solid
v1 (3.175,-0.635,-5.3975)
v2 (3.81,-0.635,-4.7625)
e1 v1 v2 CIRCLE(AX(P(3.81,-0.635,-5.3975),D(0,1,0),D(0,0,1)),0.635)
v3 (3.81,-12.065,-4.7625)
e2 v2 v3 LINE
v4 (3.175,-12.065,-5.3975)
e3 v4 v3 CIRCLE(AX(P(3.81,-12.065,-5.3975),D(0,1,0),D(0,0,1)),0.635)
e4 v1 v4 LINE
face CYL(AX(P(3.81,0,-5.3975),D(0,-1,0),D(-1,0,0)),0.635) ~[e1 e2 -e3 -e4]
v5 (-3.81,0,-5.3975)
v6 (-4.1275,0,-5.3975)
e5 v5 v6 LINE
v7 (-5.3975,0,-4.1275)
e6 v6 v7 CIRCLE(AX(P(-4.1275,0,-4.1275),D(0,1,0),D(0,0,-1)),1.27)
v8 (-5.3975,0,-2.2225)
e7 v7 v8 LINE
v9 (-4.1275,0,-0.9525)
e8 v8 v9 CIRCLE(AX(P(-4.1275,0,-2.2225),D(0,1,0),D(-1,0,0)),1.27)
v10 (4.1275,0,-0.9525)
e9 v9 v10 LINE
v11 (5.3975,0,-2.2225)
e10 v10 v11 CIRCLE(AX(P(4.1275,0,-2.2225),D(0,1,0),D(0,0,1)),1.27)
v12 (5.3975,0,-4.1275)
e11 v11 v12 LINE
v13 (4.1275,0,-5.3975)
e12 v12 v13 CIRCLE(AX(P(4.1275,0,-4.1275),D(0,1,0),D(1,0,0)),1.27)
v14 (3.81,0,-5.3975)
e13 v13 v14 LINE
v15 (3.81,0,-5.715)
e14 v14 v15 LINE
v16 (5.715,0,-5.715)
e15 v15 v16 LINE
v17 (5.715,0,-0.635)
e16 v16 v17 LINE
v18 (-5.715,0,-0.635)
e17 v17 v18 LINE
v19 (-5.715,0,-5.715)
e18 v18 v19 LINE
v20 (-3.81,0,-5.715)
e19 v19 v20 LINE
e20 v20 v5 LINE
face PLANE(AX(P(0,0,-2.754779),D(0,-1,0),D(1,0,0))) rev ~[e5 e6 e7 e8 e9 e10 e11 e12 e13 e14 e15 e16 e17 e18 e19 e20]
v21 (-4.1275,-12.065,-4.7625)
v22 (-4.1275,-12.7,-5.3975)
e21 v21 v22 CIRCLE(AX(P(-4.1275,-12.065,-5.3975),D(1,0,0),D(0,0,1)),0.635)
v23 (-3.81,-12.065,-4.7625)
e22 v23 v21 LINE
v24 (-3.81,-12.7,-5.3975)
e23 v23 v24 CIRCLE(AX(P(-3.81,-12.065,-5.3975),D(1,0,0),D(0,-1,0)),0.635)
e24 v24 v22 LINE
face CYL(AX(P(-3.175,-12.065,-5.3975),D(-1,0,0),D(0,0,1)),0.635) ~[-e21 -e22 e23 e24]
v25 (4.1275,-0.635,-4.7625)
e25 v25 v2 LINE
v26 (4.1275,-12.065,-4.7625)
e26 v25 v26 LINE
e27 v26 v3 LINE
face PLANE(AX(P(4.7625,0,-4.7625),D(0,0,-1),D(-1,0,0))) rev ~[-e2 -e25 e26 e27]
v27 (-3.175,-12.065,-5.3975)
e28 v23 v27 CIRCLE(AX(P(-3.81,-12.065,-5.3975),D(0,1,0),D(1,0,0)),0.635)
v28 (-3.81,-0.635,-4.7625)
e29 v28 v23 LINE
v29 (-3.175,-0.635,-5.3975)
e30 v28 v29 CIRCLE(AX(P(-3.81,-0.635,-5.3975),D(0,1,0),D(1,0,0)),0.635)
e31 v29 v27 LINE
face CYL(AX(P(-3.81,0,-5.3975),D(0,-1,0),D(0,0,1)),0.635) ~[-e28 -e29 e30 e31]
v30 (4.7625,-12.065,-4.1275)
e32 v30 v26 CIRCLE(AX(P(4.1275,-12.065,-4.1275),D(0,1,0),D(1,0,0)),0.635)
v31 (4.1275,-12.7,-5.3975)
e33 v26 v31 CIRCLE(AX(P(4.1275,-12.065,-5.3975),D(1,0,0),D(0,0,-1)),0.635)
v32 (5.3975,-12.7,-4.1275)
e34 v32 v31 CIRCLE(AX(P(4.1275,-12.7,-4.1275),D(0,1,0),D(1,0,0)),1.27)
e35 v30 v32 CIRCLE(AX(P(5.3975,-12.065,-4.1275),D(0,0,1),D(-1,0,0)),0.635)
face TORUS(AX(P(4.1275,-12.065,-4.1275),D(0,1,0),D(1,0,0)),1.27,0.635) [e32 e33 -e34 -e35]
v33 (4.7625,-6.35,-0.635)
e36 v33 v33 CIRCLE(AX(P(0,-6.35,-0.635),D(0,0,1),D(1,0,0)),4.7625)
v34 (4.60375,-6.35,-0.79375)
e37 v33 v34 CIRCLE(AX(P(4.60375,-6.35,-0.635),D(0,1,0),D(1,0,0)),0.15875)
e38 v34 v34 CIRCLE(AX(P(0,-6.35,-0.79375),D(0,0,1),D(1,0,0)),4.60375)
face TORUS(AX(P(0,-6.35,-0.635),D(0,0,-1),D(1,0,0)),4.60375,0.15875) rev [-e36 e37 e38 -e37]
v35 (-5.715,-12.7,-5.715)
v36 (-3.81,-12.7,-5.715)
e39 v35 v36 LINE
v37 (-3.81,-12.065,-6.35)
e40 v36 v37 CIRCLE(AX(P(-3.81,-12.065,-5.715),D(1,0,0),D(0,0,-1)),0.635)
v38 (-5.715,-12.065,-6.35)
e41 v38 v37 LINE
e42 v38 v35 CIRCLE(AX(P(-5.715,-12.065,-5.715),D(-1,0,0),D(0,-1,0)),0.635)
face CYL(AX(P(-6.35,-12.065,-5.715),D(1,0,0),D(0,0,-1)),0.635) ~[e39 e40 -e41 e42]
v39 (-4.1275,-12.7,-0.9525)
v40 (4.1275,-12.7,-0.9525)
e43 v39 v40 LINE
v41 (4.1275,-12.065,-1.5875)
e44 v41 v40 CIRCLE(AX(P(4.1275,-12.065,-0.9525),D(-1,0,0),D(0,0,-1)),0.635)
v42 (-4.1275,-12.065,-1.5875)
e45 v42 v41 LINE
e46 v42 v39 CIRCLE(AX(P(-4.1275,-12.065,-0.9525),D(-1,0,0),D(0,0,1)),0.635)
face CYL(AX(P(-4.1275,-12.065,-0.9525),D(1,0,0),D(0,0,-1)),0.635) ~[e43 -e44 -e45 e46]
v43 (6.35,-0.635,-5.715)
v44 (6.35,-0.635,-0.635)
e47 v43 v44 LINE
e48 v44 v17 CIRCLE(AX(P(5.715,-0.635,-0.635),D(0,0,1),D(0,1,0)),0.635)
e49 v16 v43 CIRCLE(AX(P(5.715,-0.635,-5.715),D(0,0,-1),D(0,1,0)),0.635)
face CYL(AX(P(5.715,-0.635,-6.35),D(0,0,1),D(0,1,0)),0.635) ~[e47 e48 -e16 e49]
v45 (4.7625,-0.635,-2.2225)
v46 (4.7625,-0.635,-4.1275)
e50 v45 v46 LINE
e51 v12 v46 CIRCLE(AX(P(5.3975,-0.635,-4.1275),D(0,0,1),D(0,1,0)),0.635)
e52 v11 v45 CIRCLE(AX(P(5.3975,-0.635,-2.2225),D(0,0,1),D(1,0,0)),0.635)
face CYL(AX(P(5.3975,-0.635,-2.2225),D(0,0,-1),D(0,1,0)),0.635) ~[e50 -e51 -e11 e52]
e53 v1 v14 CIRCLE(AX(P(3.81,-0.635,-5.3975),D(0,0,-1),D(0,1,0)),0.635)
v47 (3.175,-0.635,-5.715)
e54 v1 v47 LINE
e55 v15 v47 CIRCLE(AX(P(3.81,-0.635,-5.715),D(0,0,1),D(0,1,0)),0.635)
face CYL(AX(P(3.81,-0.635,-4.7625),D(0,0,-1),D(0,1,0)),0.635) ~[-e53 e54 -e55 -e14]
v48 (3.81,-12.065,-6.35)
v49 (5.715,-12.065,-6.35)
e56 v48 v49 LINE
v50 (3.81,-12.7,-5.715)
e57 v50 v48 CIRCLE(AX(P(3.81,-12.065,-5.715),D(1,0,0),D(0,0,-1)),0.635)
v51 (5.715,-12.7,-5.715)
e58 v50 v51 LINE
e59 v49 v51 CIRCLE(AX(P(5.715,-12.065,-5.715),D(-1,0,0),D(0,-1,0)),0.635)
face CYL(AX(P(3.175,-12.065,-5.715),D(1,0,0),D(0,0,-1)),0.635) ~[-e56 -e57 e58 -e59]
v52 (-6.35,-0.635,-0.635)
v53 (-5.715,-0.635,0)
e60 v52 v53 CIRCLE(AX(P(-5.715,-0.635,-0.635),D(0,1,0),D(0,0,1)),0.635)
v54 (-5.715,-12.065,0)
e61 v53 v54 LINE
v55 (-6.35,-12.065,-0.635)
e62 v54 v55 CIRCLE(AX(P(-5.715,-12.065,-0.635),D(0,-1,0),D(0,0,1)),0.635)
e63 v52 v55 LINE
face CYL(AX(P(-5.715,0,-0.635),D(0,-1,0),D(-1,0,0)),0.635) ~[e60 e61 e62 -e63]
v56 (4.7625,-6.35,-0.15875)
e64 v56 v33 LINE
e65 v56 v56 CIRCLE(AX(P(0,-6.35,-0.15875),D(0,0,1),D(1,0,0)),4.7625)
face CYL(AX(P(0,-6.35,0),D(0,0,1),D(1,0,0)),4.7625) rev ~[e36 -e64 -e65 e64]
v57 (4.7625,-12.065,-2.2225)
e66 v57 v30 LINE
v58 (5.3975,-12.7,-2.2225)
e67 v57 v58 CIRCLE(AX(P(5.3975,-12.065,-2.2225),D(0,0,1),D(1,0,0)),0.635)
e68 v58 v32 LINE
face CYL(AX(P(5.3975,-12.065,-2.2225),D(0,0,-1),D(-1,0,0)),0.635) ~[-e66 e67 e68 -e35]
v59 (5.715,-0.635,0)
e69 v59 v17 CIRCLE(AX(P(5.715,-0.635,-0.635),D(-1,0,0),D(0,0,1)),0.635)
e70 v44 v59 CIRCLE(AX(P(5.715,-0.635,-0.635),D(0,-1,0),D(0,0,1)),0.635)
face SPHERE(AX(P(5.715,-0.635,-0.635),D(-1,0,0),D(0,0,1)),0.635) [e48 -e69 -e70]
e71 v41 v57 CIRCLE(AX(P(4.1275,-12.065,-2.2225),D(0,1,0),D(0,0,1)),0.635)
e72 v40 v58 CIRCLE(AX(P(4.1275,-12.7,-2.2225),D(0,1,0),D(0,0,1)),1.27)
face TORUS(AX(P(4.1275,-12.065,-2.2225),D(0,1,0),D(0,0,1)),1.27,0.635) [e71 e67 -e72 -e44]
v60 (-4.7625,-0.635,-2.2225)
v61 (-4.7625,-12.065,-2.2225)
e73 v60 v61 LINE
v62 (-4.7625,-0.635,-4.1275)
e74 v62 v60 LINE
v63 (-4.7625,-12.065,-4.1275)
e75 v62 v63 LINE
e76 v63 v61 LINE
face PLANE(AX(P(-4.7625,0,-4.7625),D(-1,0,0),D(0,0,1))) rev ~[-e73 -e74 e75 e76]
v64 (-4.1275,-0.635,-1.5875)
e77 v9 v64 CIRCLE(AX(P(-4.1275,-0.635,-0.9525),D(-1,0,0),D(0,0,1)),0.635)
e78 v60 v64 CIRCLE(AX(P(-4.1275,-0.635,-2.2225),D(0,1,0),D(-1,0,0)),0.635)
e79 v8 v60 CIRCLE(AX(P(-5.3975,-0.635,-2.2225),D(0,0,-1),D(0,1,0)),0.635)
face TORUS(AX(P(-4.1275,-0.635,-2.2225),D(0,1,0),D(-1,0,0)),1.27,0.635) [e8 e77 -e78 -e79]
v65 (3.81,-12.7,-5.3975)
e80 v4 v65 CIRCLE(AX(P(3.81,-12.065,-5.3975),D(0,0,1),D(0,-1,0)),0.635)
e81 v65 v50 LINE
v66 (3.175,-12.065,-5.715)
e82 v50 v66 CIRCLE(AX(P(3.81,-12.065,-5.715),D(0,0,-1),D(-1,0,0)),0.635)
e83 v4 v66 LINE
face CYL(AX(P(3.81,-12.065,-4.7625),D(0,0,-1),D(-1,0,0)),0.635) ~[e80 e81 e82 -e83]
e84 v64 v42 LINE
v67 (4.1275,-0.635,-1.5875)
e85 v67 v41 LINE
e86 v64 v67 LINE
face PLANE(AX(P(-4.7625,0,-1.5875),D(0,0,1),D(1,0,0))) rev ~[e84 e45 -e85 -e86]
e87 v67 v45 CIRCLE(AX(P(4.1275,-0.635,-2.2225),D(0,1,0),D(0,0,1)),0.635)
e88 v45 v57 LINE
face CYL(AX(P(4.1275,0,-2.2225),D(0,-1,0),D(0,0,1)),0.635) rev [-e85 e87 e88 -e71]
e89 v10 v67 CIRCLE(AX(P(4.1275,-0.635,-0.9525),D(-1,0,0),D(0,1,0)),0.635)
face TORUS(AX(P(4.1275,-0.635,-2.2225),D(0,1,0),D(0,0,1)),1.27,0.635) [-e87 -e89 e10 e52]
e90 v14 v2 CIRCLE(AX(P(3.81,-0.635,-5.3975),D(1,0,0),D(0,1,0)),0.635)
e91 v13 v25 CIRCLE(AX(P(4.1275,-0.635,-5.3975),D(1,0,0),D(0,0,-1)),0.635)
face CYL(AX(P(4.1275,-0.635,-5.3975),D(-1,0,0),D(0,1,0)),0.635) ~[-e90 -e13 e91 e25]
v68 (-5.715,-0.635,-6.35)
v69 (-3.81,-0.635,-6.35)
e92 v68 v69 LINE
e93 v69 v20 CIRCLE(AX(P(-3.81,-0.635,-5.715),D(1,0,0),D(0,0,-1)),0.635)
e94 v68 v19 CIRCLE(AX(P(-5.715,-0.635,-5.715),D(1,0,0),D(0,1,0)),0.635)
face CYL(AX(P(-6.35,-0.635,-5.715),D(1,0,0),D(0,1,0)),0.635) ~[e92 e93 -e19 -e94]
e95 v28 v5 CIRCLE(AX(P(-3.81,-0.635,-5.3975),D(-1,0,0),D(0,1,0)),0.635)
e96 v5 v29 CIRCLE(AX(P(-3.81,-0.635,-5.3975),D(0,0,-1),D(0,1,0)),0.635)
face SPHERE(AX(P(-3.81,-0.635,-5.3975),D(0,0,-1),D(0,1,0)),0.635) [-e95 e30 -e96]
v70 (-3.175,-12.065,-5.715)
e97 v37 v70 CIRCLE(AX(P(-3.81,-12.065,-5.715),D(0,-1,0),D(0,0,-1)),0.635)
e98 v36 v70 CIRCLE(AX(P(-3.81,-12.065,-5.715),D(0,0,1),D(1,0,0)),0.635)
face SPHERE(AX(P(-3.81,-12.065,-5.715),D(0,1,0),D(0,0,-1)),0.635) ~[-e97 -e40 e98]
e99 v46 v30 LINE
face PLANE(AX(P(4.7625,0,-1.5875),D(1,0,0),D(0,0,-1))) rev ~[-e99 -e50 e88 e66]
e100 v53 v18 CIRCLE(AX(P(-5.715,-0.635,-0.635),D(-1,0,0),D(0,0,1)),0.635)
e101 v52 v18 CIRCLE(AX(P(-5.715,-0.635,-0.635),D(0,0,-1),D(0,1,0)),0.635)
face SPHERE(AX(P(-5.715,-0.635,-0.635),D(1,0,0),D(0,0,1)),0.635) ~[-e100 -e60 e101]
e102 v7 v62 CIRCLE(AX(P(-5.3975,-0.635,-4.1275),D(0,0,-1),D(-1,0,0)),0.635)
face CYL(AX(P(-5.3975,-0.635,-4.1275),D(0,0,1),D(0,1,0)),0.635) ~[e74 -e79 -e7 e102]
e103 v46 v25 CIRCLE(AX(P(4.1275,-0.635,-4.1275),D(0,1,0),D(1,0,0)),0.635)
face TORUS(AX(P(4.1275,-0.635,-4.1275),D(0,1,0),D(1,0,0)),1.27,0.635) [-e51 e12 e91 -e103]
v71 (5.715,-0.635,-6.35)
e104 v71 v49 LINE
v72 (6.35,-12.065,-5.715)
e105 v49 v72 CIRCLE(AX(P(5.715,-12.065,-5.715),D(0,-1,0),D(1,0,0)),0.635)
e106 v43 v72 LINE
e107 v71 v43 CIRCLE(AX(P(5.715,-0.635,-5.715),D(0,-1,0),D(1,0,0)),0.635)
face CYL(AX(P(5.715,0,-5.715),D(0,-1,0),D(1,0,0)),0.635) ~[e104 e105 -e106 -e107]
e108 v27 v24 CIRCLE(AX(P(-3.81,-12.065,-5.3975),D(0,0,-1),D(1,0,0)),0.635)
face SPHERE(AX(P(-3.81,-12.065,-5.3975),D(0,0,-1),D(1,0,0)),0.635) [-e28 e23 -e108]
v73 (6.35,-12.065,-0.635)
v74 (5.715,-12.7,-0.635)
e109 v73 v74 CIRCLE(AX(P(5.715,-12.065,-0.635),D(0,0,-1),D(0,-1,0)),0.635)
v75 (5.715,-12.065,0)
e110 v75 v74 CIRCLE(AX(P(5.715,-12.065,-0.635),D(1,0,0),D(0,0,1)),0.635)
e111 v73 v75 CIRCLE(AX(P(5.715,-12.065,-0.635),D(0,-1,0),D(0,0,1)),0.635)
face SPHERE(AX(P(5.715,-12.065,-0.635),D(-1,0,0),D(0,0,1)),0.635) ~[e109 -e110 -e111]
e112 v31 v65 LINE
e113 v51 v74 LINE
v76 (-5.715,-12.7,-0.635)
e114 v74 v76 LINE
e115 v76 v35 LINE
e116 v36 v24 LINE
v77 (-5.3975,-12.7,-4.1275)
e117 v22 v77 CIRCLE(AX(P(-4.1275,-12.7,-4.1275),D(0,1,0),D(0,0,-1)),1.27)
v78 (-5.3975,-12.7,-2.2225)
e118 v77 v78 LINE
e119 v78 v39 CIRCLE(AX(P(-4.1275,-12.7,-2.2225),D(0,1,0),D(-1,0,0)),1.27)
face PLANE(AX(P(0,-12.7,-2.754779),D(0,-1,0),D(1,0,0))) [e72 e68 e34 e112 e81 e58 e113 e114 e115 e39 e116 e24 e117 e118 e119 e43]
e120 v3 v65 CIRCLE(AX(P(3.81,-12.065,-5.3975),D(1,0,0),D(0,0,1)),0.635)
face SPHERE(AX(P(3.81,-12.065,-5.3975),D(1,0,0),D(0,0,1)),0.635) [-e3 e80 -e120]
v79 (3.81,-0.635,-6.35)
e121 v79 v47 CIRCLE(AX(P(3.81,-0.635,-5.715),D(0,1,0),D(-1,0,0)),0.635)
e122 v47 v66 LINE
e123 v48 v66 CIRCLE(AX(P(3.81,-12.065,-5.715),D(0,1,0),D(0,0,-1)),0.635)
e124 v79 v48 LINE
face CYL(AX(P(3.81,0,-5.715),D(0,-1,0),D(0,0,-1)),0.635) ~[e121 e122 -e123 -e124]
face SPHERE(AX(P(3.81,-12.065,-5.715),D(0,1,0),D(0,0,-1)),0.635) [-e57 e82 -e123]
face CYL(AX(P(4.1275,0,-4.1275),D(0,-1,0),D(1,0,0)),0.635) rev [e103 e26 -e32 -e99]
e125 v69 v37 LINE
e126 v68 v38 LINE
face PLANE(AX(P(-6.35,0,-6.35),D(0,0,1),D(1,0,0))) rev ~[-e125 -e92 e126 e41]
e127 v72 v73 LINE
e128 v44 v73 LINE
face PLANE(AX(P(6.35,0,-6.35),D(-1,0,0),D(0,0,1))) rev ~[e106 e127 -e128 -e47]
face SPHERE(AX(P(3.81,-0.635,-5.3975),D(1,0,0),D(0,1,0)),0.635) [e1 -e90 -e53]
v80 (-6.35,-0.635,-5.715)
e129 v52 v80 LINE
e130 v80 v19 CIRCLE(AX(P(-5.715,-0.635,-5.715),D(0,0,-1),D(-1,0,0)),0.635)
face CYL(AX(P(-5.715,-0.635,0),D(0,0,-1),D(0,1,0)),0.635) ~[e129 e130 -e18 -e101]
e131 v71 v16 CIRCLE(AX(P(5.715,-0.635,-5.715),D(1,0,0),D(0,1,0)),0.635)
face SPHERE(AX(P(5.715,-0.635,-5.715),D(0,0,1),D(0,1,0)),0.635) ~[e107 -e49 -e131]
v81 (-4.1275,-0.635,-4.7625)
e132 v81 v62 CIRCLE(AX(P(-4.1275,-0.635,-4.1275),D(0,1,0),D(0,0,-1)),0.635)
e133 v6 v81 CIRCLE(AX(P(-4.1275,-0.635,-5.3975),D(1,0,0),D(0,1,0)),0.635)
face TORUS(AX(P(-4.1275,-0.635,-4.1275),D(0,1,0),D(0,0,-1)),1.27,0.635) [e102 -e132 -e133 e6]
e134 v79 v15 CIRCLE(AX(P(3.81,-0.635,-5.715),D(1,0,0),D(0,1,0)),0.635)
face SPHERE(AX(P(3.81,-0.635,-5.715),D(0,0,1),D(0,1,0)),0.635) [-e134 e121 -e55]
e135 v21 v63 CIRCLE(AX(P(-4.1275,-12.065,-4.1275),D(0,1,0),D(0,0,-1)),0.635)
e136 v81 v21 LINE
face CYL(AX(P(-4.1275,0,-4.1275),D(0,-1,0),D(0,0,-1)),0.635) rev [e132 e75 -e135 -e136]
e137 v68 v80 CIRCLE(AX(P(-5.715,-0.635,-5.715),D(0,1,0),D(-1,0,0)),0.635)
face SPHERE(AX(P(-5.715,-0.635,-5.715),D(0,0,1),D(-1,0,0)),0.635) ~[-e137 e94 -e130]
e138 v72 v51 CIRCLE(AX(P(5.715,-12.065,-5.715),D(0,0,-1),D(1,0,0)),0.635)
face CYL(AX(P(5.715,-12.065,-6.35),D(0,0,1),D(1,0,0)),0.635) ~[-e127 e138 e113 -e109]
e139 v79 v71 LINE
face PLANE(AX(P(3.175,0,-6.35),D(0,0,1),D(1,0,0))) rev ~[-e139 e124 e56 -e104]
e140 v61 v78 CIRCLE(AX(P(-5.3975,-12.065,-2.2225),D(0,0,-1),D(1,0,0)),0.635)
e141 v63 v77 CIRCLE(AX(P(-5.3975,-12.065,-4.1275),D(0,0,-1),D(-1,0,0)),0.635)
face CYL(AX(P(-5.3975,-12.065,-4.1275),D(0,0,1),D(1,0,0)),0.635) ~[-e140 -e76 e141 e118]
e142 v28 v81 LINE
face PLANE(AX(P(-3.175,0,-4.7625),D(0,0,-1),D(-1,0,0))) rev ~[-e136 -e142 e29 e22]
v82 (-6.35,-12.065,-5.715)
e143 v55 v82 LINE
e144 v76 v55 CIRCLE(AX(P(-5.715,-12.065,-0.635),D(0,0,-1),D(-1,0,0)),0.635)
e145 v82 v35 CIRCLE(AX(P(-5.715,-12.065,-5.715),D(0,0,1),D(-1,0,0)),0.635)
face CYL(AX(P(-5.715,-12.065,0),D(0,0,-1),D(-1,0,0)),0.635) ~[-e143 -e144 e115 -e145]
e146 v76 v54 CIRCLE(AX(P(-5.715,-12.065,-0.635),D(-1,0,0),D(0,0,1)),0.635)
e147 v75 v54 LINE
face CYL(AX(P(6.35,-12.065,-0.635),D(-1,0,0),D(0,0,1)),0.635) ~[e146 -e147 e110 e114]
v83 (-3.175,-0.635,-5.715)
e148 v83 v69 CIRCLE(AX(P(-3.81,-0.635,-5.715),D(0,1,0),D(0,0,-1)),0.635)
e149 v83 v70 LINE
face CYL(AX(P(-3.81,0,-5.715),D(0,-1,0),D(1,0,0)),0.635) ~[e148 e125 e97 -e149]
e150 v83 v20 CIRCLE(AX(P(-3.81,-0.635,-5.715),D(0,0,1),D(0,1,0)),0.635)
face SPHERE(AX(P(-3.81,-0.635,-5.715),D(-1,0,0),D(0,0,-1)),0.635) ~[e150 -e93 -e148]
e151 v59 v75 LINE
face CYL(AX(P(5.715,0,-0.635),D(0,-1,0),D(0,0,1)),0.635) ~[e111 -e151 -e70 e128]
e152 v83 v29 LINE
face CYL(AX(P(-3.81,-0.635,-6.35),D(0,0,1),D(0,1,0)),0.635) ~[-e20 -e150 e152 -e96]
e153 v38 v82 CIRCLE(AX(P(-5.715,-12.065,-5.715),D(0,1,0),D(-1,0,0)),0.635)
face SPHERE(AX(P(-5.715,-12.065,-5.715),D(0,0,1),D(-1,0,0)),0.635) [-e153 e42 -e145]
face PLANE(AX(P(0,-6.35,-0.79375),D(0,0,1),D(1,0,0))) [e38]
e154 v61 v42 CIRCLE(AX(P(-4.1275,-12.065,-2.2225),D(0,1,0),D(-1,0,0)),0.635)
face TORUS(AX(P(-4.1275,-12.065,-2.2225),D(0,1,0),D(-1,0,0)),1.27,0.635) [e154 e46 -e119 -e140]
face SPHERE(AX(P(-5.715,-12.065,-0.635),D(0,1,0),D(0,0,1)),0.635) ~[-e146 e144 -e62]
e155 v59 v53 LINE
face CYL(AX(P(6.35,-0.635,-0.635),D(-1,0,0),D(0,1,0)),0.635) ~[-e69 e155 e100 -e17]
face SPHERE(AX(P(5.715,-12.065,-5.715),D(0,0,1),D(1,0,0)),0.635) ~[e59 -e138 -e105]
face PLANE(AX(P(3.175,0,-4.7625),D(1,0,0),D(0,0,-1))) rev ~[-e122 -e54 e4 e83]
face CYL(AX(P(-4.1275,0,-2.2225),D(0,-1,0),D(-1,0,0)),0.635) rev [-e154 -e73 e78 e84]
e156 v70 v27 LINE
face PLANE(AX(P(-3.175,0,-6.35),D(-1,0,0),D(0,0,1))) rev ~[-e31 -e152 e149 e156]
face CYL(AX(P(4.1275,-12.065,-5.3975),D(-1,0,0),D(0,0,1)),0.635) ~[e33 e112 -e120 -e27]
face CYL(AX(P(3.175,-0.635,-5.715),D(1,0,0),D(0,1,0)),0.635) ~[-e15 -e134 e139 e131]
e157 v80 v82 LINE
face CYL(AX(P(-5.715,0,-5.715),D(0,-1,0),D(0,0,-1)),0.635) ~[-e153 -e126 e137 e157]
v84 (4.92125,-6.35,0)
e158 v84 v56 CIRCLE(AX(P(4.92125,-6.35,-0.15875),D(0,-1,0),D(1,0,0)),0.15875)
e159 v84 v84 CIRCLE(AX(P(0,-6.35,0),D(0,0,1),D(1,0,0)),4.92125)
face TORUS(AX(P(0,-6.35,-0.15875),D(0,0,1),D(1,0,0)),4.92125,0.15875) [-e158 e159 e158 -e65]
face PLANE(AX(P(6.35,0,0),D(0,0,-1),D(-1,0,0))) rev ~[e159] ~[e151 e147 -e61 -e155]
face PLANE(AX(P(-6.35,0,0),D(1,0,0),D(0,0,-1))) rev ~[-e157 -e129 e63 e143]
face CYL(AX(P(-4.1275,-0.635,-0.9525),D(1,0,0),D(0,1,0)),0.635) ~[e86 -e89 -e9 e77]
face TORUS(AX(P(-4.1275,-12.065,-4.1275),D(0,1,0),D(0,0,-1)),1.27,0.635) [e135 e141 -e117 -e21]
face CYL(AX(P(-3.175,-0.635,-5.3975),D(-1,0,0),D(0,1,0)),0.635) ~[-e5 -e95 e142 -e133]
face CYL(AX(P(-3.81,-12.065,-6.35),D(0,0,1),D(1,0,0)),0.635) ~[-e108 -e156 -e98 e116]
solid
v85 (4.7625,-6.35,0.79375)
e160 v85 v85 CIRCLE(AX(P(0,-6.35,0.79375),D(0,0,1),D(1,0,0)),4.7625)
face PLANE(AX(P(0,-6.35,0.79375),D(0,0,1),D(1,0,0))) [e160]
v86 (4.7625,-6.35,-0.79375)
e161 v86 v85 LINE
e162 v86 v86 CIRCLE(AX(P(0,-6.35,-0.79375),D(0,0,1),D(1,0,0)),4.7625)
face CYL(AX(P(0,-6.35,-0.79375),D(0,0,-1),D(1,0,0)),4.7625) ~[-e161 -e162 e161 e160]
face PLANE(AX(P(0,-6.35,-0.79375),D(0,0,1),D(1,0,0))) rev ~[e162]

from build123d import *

# Parameters (mm, degrees)
F1_DEPTH = 12.7
F2_R     = 4.7625
F3_DEPTH = 0.79375
F4_F1_R  = 0.635
F4_F2_R  = 0.635
F5_R     = 0.15875
F7_R     = 4.7625
F8_DEPTH = 1.5875


with BuildPart() as f1:
    # F0 (on Front) → F1 (new body)
    with BuildSketch(Plane.XZ):
        Polygon((6.35, 0), (-6.35, 0), (-6.35, -6.35), (-3.175, -6.35), (-3.175, -4.7625), (-4.7625, -4.7625), (-4.7625, -1.5875), (4.7625, -1.5875), (4.7625, -4.7625), (3.175, -4.7625), (3.175, -6.35), (6.35, -6.35), align=None)
    extrude(amount=F1_DEPTH)

    # F2 (on face) → F3 (cut)
    with BuildSketch(Plane.XY):
        with Locations((0, -6.35)):
            Circle(F2_R)
    extrude(amount=-F3_DEPTH, mode=Mode.SUBTRACT)

    # F4: fillet of radius 0.635 on 35 edges, made by hand

    # F4_f1
    f4_f1_edges = [f1.edges().sort_by_distance(p)[0] for p in [
        (-4.7625, -6.35, -4.7625),
        (-4.7625, -6.35, -1.5875),
        (4.7625, -6.35, -1.5875),
        (4.7625, -6.35, -4.7625),
    ]]
    fillet(f4_f1_edges, radius=F4_F1_R)

    # F4_f2
    f4_f2_edges = [f1.edges().sort_by_distance(p)[0] for p in [
        (0, 0, 0),
        (-6.35, -6.35, 0),
        (0, -12.7, 0),
        (6.35, -6.35, 0),
        (-6.35, 0, -3.175),
        (-6.35, -12.7, -3.175),
        (6.35, 0, -3.175),
        (6.35, -12.7, -3.175),
        (-6.35, -6.35, -6.35),
        (-4.7625, 0, -6.35),
        (-3.175, -6.35, -6.35),
        (-4.7625, -12.7, -6.35),
        (-3.175, 0, -5.55625),
        (-3.175, -12.7, -5.55625),
        (-3.65125, 0, -4.7625),
        (-4.7625, 0, -3.175),
        (0, 0, -1.5875),
        (-3.175, -6.35, -4.7625),
        (3.175, 0, -5.55625),
        (3.65125, 0, -4.7625),
        (4.7625, 0, -3.175),
        (4.7625, 0, -6.35),
        (4.7625, -12.7, -3.175),
        (3.175, -6.35, -4.7625),
        (3.175, -6.35, -6.35),
        (6.35, -6.35, -6.35),
        (3.65125, -12.7, -4.7625),
        (4.7625, -12.7, -6.35),
        (3.175, -12.7, -5.55625),
        (-4.7625, -12.7, -3.175),
        (0, -12.7, -1.5875),
        (-4.5765128061, -12.7, -1.7734871939),
        (4.5765128061, -12.7, -1.7734871939),
        (-4.5765128061, -12.7, -4.5765128061),
        (4.5765128061, -12.7, -4.5765128061),
        (4.5765128061, 0, -1.7734871939),
        (4.5765128061, 0, -4.5765128061),
        (-4.5765128061, 0, -1.7734871939),
        (-4.5765128061, 0, -4.5765128061),
    ]]
    fillet(f4_f2_edges, radius=F4_F2_R)

    # F5
    f5_edges = [f1.edges().sort_by_distance(p)[0] for p in [
        (-4.7625, -6.35, 0),
        (-4.7625, -6.35, -0.79375),
    ]]
    fillet(f5_edges, radius=F5_R)


with BuildPart() as f8:
    # F7 (on offset) → F8 (new body)
    with BuildSketch(Plane.XY.offset(-0.79375)):
        with Locations((0, -6.35)):
            Circle(F7_R)
    extrude(amount=F8_DEPTH)


solid = Compound([f1.part, f8.part])
